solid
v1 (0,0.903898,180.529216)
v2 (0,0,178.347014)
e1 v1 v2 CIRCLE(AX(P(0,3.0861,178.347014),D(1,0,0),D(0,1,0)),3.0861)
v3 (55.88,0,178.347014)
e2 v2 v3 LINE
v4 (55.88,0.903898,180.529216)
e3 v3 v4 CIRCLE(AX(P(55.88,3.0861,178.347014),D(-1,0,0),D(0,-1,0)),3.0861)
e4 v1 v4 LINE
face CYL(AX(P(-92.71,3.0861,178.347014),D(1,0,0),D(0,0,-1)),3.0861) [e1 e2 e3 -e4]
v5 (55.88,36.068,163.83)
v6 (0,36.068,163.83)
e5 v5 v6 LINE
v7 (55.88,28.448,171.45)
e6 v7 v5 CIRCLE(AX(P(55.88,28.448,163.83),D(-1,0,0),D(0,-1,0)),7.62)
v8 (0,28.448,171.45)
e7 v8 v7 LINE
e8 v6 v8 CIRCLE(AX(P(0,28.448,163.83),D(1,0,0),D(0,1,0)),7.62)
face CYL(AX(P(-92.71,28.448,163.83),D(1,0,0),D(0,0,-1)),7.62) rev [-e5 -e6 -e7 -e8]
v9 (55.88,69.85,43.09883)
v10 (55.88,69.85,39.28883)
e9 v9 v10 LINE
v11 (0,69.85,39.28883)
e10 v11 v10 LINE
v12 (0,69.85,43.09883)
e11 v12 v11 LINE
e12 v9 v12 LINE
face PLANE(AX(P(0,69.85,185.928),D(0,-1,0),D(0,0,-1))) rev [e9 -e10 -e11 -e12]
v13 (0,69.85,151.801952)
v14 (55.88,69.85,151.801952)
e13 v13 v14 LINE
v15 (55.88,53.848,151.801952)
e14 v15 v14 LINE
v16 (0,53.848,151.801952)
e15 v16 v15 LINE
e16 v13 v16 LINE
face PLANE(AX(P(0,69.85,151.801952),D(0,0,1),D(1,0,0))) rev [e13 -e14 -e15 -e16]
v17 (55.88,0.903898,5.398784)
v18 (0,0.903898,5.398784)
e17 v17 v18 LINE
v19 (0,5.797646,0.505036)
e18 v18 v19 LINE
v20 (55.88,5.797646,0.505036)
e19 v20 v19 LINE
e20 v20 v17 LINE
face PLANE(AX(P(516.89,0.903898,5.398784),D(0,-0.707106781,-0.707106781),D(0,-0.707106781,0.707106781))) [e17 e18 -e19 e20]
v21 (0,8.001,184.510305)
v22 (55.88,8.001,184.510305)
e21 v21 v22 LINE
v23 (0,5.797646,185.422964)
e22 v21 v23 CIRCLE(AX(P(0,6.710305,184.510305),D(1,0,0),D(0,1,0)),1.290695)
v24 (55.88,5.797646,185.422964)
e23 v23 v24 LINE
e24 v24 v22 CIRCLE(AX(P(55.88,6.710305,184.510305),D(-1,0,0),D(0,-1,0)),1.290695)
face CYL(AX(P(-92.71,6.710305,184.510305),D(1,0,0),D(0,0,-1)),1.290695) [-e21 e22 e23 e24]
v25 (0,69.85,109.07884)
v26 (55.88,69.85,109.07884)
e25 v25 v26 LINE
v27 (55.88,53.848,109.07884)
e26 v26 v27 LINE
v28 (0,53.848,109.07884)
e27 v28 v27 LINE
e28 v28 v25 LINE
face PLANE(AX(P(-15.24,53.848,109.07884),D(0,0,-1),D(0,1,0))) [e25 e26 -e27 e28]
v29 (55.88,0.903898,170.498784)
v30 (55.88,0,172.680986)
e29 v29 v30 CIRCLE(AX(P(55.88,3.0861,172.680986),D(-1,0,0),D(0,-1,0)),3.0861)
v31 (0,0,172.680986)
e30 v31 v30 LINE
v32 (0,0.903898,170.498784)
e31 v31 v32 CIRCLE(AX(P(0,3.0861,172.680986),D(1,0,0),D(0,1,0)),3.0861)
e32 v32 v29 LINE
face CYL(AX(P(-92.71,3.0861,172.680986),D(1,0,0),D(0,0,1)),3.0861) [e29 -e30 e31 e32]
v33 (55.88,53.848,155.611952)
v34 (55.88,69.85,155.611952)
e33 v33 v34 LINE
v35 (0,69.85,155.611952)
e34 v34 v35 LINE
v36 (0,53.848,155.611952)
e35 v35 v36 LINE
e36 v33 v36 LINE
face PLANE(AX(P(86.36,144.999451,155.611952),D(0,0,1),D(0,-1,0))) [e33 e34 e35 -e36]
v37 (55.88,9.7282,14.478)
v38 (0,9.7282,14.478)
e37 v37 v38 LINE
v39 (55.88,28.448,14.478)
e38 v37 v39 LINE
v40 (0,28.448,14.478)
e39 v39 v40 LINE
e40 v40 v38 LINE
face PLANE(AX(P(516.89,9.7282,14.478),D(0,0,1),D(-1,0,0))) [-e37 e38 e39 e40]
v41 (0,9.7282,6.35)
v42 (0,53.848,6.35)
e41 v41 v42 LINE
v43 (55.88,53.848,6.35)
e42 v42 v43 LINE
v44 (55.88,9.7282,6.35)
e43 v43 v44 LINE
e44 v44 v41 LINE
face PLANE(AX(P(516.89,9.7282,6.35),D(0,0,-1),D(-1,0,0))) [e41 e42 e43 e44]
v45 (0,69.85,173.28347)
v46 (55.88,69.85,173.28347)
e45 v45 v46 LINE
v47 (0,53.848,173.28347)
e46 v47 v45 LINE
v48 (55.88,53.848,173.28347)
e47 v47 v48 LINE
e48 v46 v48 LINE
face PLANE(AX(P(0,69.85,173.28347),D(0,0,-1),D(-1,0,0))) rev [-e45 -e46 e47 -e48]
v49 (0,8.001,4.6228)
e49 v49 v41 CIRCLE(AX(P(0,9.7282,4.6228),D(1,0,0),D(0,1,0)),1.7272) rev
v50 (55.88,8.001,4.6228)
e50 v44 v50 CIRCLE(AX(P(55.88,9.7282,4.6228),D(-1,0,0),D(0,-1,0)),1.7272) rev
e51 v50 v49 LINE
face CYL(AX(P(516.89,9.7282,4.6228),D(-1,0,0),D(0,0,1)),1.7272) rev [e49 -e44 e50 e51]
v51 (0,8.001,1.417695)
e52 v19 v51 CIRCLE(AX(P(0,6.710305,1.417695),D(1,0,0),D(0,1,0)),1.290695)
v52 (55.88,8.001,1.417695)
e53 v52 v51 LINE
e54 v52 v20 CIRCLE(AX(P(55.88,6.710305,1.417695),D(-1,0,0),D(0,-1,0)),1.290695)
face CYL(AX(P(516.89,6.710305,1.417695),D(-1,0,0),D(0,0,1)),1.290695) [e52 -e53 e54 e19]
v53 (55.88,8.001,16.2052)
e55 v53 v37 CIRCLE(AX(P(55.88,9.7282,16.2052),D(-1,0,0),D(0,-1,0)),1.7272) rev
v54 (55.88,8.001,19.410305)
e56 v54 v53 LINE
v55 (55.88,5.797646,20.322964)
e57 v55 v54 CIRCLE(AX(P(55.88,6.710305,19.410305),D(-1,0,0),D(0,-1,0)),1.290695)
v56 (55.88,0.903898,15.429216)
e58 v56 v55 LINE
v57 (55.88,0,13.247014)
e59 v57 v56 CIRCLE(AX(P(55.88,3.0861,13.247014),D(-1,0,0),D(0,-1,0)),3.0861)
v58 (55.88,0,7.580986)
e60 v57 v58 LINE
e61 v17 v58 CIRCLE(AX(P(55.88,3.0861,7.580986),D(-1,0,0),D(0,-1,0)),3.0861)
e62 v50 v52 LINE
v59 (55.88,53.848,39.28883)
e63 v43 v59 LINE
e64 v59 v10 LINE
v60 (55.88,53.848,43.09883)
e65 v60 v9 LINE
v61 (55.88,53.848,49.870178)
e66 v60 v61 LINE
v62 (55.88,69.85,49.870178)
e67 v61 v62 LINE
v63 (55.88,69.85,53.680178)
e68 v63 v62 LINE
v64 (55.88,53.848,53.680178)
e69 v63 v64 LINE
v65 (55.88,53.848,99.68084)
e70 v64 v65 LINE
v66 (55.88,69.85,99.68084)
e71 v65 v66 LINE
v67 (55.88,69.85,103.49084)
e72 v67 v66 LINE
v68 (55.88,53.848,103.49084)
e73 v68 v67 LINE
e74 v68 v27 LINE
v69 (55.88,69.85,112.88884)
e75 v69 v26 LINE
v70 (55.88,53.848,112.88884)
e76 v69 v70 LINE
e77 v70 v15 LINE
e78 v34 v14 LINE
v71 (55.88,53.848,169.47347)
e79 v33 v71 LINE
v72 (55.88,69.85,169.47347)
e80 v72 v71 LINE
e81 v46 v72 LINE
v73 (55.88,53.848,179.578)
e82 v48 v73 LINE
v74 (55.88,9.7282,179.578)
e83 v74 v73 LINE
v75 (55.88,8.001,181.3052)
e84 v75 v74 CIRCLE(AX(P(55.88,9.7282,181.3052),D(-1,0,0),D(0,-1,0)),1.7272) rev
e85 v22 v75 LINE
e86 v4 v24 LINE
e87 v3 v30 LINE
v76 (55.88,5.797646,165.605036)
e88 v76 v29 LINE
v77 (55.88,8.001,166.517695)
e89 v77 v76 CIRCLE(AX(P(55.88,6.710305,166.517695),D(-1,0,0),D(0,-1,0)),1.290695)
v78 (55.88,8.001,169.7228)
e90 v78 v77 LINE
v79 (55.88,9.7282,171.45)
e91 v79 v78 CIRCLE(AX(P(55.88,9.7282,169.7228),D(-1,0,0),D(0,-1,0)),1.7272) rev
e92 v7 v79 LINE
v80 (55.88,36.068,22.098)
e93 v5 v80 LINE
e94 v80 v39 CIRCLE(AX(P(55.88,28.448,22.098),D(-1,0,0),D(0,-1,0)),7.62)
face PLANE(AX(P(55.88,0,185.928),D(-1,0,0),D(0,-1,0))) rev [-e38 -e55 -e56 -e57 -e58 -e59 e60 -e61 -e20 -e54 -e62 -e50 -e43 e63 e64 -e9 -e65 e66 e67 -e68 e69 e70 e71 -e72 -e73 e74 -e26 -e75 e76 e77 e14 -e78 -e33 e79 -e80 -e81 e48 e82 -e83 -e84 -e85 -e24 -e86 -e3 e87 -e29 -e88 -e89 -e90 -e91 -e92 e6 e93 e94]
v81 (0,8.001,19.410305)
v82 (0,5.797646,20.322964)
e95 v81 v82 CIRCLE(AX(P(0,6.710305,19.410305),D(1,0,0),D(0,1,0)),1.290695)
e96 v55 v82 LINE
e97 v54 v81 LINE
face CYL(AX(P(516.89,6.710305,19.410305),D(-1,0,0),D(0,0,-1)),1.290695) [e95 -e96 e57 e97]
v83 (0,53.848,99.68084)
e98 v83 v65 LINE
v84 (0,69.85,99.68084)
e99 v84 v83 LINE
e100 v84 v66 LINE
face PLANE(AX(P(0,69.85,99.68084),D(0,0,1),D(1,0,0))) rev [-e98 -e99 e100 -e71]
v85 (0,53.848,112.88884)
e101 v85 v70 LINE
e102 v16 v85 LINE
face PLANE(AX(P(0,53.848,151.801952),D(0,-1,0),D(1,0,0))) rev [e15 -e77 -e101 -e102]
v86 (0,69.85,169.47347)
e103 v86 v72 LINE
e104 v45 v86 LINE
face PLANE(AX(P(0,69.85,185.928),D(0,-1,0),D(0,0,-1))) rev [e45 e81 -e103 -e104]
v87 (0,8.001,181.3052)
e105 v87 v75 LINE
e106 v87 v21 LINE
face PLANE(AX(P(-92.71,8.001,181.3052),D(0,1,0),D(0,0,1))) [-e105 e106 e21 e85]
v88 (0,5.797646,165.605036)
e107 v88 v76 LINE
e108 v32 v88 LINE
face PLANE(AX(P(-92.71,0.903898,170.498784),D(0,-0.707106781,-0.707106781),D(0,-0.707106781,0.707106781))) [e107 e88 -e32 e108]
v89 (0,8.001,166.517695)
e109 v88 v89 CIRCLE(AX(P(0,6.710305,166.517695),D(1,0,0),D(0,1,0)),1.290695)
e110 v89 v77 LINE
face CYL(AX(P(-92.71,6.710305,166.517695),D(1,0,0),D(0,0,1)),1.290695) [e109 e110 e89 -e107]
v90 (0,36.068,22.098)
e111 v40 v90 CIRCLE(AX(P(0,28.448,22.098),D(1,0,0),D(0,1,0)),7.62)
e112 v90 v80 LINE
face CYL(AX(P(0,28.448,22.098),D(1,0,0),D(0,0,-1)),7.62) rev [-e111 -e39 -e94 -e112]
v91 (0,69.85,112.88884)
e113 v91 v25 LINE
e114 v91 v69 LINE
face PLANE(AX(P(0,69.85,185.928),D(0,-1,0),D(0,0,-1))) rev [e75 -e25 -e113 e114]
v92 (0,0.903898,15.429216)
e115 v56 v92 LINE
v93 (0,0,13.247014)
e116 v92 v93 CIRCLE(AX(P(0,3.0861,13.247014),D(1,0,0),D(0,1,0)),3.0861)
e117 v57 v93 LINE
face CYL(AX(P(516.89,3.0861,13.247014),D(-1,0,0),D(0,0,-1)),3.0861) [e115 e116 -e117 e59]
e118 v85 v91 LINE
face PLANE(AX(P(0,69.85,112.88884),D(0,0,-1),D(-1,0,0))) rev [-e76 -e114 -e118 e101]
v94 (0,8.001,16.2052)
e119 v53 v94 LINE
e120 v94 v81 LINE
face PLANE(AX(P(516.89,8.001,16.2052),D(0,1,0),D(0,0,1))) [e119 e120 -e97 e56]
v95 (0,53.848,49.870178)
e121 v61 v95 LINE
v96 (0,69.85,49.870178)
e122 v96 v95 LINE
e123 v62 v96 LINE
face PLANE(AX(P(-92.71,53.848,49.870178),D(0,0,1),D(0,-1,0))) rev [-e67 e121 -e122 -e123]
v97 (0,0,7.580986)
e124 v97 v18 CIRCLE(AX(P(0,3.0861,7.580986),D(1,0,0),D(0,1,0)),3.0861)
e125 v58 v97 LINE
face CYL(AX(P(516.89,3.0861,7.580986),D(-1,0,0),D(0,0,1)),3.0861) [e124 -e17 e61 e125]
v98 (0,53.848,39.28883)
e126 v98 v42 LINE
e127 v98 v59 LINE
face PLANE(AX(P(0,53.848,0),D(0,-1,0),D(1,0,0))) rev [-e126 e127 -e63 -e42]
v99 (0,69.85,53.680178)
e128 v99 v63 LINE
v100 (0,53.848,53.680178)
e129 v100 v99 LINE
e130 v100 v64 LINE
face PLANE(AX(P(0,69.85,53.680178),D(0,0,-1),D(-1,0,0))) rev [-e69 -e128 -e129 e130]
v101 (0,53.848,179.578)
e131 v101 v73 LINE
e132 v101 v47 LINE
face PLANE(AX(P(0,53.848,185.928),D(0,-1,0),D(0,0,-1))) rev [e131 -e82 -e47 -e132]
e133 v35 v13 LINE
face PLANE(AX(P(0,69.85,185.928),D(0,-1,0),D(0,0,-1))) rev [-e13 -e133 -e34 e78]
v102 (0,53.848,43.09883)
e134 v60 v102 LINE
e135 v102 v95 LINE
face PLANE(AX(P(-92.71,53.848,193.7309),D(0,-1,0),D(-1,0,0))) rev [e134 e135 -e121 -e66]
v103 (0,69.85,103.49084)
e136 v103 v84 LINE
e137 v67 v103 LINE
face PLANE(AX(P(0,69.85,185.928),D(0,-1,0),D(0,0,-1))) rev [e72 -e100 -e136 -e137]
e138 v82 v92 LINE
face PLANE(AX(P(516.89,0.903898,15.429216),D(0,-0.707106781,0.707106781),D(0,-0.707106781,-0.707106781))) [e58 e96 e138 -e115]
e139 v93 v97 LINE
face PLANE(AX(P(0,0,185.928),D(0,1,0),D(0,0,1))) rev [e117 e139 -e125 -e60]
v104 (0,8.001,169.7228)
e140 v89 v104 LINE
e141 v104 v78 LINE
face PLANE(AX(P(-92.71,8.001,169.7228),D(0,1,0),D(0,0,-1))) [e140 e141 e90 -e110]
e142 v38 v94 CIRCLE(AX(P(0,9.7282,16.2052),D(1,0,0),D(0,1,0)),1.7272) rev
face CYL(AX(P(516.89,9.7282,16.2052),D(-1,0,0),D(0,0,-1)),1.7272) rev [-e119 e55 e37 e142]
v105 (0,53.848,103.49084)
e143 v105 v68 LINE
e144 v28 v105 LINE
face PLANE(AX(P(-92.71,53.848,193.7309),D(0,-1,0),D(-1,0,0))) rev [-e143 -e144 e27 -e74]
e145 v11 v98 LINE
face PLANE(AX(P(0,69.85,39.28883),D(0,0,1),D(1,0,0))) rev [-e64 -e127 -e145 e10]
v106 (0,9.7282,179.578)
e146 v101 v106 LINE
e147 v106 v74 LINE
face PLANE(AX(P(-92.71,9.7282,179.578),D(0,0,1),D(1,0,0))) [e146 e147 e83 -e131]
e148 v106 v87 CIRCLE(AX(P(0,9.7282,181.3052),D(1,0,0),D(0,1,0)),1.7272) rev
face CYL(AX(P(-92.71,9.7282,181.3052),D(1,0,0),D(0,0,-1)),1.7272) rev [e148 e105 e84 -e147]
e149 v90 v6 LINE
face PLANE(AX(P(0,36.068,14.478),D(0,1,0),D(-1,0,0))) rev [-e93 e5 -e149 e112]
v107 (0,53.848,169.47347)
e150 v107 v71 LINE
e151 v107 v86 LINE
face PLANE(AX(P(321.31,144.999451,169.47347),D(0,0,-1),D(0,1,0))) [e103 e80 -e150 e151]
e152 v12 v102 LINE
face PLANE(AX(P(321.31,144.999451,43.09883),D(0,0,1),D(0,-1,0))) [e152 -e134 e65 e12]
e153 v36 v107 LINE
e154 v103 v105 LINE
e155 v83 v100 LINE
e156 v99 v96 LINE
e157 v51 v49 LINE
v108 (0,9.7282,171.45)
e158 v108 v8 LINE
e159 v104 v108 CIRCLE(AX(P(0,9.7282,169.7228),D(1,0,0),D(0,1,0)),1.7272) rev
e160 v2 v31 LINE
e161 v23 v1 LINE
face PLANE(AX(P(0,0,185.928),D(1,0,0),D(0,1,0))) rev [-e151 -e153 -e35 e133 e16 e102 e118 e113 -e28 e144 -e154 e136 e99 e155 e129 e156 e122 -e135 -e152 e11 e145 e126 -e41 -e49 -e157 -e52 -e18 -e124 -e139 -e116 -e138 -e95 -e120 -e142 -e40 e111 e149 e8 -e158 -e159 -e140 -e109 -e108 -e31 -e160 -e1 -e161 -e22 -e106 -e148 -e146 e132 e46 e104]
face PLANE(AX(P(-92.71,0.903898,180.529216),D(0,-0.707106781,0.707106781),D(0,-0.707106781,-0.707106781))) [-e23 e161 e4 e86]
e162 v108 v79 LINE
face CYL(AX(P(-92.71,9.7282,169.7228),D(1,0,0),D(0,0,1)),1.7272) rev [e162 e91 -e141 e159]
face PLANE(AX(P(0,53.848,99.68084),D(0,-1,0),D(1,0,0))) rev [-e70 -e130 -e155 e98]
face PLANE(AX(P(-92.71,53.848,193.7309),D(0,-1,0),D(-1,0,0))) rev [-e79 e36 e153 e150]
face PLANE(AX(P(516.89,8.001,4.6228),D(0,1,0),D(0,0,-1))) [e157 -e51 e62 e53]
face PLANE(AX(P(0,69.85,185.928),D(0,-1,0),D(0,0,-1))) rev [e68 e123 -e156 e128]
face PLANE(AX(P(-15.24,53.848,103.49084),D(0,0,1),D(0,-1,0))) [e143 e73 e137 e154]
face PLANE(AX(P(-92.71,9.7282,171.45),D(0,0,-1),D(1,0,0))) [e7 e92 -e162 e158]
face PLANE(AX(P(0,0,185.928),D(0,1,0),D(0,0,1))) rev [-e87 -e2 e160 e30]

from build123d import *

# Parameters (mm, degrees)
SKETCH1_W               = 55.88
SKETCH1_H               = 69.85
BOSS_EXTRUDE1_DEPTH     = 185.928
CAVITY2_DEPTH           = 55.88
CUT_EXTRUDE1_DEPTH      = 207.326968872
CUT_EXTRUDE1_DEPTH_BACK = 207.326968872
CAVITY3_START           = 155.611951918
CAVITY3_OUTLINE_W       = 55.88
CAVITY3_OUTLINE_H       = 16.002
CAVITY3_DEPTH           = 13.861518057
CAVITY3_START_2         = 43.09882965
CAVITY3_2_OUTLINE_W     = 55.88
CAVITY3_2_OUTLINE_H     = 16.002
CAVITY3_2_DEPTH         = 6.77134799
CAVITY3_START_3         = 103.490840018
CAVITY3_3_OUTLINE_W     = 55.88
CAVITY3_3_OUTLINE_H     = 16.002
CAVITY3_3_DEPTH         = 5.588
CUT_EXTRUDE2_DEPTH      = 207.326968872
CUT_EXTRUDE2_DEPTH_BACK = 207.326968872
SKETCH4_W               = 12.644530025
SKETCH4_H               = 16.002
SKETCH4_W_2             = 38.9131119
SKETCH4_W_3             = 46.000662378
SKETCH4_W_4             = 39.28882965
FILLET1_R               = 7.62


# Read off the part's stored shape, not the designer's step: Cavity2, Cavity3
with BuildPart() as part:
    # Sketch1 → Boss-Extrude1 (new body)
    with BuildSketch(Plane.XY):
        with Locations((27.94, 34.925)):
            Rectangle(SKETCH1_W, SKETCH1_H)
    extrude(amount=BOSS_EXTRUDE1_DEPTH)

    # Cavity2 outline → Cavity2 (cut)
    with BuildSketch(Plane.YZ):
        with BuildLine():
            Line((0, 185.372681959), (0, 178.347013566))
            ThreePointArc((0, 178.347013566), (0.234915375, 179.528012907), (0.903897763, 180.529215804))
            Line((0.903897763, 180.529215804), (5.797646215, 185.422964256))
            ThreePointArc((5.797646215, 185.422964256), (7.204232738, 185.702751711), (8.001, 184.510305235))
            Line((8.001, 184.510305235), (8.001, 181.3052))
            ThreePointArc((8.001, 181.3052), (8.506885168, 180.083885168), (9.7282, 179.578))
            Line((9.7282, 179.578), (10.3378, 179.578))
            ThreePointArc((10.3378, 179.578), (11.559114832, 180.083885168), (12.065, 181.3052))
            Line((12.065, 181.3052), (12.065, 182.478305235))
            ThreePointArc((12.065, 182.478305235), (11.049, 183.494305235), (12.065, 184.510305235))
            Line((12.065, 184.510305235), (12.065, 185.928))
            Line((12.065, 185.928), (0.555318041, 185.928))
            Line((0.555318041, 185.928), (0, 185.372681959))
        make_face()
        with BuildLine():
            Line((0, 160.528), (0, 156.668018354))
            ThreePointArc((0, 156.668018354), (1.097837867, 157.474813069), (2.011305235, 156.464))
            Line((2.011305235, 156.464), (6.738477062, 156.464))
            ThreePointArc((6.738477062, 156.464), (7.643464695, 157.473916954), (8.74621772, 156.684695417))
            ThreePointArc((8.74621772, 156.684695417), (10.673815789, 157.855184211), (11.844304583, 159.78278228))
            ThreePointArc((11.844304583, 159.78278228), (11.055083046, 160.885535305), (12.065, 161.790522938))
            Line((12.065, 161.790522938), (12.065, 166.517694765))
            ThreePointArc((12.065, 166.517694765), (11.049, 167.533694765), (12.065, 168.549694765))
            Line((12.065, 168.549694765), (12.065, 169.7228))
            ThreePointArc((12.065, 169.7228), (11.559114832, 170.944114832), (10.3378, 171.45))
            Line((10.3378, 171.45), (9.7282, 171.45))
            ThreePointArc((9.7282, 171.45), (8.506885168, 170.944114832), (8.001, 169.7228))
            Line((8.001, 169.7228), (8.001, 166.517694765))
            ThreePointArc((8.001, 166.517694765), (7.204232738, 165.325248289), (5.797646215, 165.605035744))
            Line((5.797646215, 165.605035744), (0.903897763, 170.498784196))
            ThreePointArc((0.903897763, 170.498784196), (0.234915375, 171.499987093), (0, 172.680986434))
            Line((0, 172.680986434), (0, 165.655318041))
            Line((0, 165.655318041), (2.923964256, 162.731353785))
            ThreePointArc((2.923964256, 162.731353785), (3.203751711, 161.324767262), (2.011305235, 160.528))
            Line((2.011305235, 160.528), (0, 160.528))
        make_face()
        with BuildLine():
            Line((0, 20.272681959), (0, 13.247013566))
            ThreePointArc((0, 13.247013566), (0.234915375, 14.428012907), (0.903897763, 15.429215804))
            Line((0.903897763, 15.429215804), (5.797646215, 20.322964256))
            ThreePointArc((5.797646215, 20.322964256), (7.204232738, 20.602751711), (8.001, 19.410305235))
            Line((8.001, 19.410305235), (8.001, 16.2052))
            ThreePointArc((8.001, 16.2052), (8.506885168, 14.983885168), (9.7282, 14.478))
            Line((9.7282, 14.478), (10.3378, 14.478))
            ThreePointArc((10.3378, 14.478), (11.559114832, 14.983885168), (12.065, 16.2052))
            Line((12.065, 16.2052), (12.065, 17.378305235))
            ThreePointArc((12.065, 17.378305235), (11.049, 18.394305235), (12.065, 19.410305235))
            Line((12.065, 19.410305235), (12.065, 24.137477062))
            ThreePointArc((12.065, 24.137477062), (11.055083046, 25.042464695), (11.844304583, 26.14521772))
            ThreePointArc((11.844304583, 26.14521772), (10.673815789, 28.072815789), (8.74621772, 29.243304583))
            ThreePointArc((8.74621772, 29.243304583), (7.643464695, 28.454083046), (6.738477062, 29.464))
            Line((6.738477062, 29.464), (2.011305235, 29.464))
            ThreePointArc((2.011305235, 29.464), (1.097837867, 28.453186931), (0, 29.259981646))
            Line((0, 29.259981646), (0, 25.4))
            Line((0, 25.4), (2.011305235, 25.4))
            ThreePointArc((2.011305235, 25.4), (3.203751711, 24.603232738), (2.923964256, 23.196646215))
            Line((2.923964256, 23.196646215), (0, 20.272681959))
        make_face()
        with BuildLine():
            Line((12.065, 0), (12.065, 1.417694765))
            ThreePointArc((12.065, 1.417694765), (11.049, 2.433694765), (12.065, 3.449694765))
            Line((12.065, 3.449694765), (12.065, 4.6228))
            ThreePointArc((12.065, 4.6228), (11.559114832, 5.844114832), (10.3378, 6.35))
            Line((10.3378, 6.35), (9.7282, 6.35))
            ThreePointArc((9.7282, 6.35), (8.506885168, 5.844114832), (8.001, 4.6228))
            Line((8.001, 4.6228), (8.001, 1.417694765))
            ThreePointArc((8.001, 1.417694765), (7.204232738, 0.225248289), (5.797646215, 0.505035744))
            Line((5.797646215, 0.505035744), (0.903897763, 5.398784196))
            ThreePointArc((0.903897763, 5.398784196), (0.234915375, 6.399987093), (0, 7.580986434))
            Line((0, 7.580986434), (0, 0.555318041))
            Line((0, 0.555318041), (0.555318041, 0))
            Line((0.555318041, 0), (12.065, 0))
        make_face()
    extrude(amount=CAVITY2_DEPTH, mode=Mode.SUBTRACT)

    # Sketch2 → Cut-Extrude1 (cut, two sides: drawn at the far end of the back side and taken through both)
    with BuildSketch(Plane(origin=(55.88, 0, 0), x_dir=(0, 0, -1), z_dir=(1, 0, 0)).offset(-CUT_EXTRUDE1_DEPTH_BACK)):
        Polygon((-185.928, 53.848), (-185.928, 12.065), (-187.786827766, 0), (-183.387405269, 0), (-186.368592882, 6.922214935), (-185.928, 7.695543501), (-179.578, 10.033), (-179.578, 53.848), align=None)
        Polygon((-171.45, 36.068), (-171.45, 10.033), (-163.181232022, 10.033), (-165.655318041, 0), (-20.272681959, 0), (-21.714355158, 8.498769389), (-14.478, 10.033), (-14.478, 36.068), align=None)
        Polygon((0.982362905, -0.670371441), (0, 12.065), (0, 53.848), (-6.35, 53.848), (-6.35, 10.033), (-1.572527278, 10.022034637), (0.234962195, 6.712117206), (-3.38001675, -0.670371441), align=None)
    extrude(amount=CUT_EXTRUDE1_DEPTH + CUT_EXTRUDE1_DEPTH_BACK, mode=Mode.SUBTRACT)

    # Cavity3 outline → Cavity3 (cut)
    with BuildSketch(Plane.XY.offset(CAVITY3_START)):
        with Locations((27.94, 61.849)):
            Rectangle(CAVITY3_OUTLINE_W, CAVITY3_OUTLINE_H)
    extrude(amount=CAVITY3_DEPTH, mode=Mode.SUBTRACT)

    # Cavity3 2 outline → Cavity3 2 (cut)
    with BuildSketch(Plane.XY.offset(CAVITY3_START_2)):
        with Locations((27.94, 61.849)):
            Rectangle(CAVITY3_2_OUTLINE_W, CAVITY3_2_OUTLINE_H)
    extrude(amount=CAVITY3_2_DEPTH, mode=Mode.SUBTRACT)

    # Cavity3 3 outline → Cavity3 3 (cut)
    with BuildSketch(Plane.XY.offset(CAVITY3_START_3)):
        with Locations((27.94, 61.849)):
            Rectangle(CAVITY3_3_OUTLINE_W, CAVITY3_3_OUTLINE_H)
    extrude(amount=CAVITY3_3_DEPTH, mode=Mode.SUBTRACT)

    # Sketch4 → Cut-Extrude2 (cut, two sides: drawn at the far end of the back side and taken through both)
    with BuildSketch(Plane(origin=(55.88, 0, 0), x_dir=(0, 0, -1), z_dir=(1, 0, 0)).offset(-CUT_EXTRUDE2_DEPTH_BACK)):
        with Locations((-179.605734987, 61.849)):
            Rectangle(SKETCH4_W, SKETCH4_H)
        with Locations((-132.345395968, 61.849)):
            Rectangle(SKETCH4_W_2, SKETCH4_H)
        with Locations((-76.680508829, 61.849)):
            Rectangle(SKETCH4_W_3, SKETCH4_H)
        with Locations((-19.644414825, 61.849)):
            Rectangle(SKETCH4_W_4, SKETCH4_H)
    extrude(amount=CUT_EXTRUDE2_DEPTH + CUT_EXTRUDE2_DEPTH_BACK, mode=Mode.SUBTRACT)

    # Fillet1
    fillet1_edges = [part.edges().sort_by_distance(p)[0] for p in [
        (27.94, 36.068, 14.478),
        (27.94, 36.068, 171.45),
    ]]
    fillet(fillet1_edges, radius=FILLET1_R)


solid = part.part
